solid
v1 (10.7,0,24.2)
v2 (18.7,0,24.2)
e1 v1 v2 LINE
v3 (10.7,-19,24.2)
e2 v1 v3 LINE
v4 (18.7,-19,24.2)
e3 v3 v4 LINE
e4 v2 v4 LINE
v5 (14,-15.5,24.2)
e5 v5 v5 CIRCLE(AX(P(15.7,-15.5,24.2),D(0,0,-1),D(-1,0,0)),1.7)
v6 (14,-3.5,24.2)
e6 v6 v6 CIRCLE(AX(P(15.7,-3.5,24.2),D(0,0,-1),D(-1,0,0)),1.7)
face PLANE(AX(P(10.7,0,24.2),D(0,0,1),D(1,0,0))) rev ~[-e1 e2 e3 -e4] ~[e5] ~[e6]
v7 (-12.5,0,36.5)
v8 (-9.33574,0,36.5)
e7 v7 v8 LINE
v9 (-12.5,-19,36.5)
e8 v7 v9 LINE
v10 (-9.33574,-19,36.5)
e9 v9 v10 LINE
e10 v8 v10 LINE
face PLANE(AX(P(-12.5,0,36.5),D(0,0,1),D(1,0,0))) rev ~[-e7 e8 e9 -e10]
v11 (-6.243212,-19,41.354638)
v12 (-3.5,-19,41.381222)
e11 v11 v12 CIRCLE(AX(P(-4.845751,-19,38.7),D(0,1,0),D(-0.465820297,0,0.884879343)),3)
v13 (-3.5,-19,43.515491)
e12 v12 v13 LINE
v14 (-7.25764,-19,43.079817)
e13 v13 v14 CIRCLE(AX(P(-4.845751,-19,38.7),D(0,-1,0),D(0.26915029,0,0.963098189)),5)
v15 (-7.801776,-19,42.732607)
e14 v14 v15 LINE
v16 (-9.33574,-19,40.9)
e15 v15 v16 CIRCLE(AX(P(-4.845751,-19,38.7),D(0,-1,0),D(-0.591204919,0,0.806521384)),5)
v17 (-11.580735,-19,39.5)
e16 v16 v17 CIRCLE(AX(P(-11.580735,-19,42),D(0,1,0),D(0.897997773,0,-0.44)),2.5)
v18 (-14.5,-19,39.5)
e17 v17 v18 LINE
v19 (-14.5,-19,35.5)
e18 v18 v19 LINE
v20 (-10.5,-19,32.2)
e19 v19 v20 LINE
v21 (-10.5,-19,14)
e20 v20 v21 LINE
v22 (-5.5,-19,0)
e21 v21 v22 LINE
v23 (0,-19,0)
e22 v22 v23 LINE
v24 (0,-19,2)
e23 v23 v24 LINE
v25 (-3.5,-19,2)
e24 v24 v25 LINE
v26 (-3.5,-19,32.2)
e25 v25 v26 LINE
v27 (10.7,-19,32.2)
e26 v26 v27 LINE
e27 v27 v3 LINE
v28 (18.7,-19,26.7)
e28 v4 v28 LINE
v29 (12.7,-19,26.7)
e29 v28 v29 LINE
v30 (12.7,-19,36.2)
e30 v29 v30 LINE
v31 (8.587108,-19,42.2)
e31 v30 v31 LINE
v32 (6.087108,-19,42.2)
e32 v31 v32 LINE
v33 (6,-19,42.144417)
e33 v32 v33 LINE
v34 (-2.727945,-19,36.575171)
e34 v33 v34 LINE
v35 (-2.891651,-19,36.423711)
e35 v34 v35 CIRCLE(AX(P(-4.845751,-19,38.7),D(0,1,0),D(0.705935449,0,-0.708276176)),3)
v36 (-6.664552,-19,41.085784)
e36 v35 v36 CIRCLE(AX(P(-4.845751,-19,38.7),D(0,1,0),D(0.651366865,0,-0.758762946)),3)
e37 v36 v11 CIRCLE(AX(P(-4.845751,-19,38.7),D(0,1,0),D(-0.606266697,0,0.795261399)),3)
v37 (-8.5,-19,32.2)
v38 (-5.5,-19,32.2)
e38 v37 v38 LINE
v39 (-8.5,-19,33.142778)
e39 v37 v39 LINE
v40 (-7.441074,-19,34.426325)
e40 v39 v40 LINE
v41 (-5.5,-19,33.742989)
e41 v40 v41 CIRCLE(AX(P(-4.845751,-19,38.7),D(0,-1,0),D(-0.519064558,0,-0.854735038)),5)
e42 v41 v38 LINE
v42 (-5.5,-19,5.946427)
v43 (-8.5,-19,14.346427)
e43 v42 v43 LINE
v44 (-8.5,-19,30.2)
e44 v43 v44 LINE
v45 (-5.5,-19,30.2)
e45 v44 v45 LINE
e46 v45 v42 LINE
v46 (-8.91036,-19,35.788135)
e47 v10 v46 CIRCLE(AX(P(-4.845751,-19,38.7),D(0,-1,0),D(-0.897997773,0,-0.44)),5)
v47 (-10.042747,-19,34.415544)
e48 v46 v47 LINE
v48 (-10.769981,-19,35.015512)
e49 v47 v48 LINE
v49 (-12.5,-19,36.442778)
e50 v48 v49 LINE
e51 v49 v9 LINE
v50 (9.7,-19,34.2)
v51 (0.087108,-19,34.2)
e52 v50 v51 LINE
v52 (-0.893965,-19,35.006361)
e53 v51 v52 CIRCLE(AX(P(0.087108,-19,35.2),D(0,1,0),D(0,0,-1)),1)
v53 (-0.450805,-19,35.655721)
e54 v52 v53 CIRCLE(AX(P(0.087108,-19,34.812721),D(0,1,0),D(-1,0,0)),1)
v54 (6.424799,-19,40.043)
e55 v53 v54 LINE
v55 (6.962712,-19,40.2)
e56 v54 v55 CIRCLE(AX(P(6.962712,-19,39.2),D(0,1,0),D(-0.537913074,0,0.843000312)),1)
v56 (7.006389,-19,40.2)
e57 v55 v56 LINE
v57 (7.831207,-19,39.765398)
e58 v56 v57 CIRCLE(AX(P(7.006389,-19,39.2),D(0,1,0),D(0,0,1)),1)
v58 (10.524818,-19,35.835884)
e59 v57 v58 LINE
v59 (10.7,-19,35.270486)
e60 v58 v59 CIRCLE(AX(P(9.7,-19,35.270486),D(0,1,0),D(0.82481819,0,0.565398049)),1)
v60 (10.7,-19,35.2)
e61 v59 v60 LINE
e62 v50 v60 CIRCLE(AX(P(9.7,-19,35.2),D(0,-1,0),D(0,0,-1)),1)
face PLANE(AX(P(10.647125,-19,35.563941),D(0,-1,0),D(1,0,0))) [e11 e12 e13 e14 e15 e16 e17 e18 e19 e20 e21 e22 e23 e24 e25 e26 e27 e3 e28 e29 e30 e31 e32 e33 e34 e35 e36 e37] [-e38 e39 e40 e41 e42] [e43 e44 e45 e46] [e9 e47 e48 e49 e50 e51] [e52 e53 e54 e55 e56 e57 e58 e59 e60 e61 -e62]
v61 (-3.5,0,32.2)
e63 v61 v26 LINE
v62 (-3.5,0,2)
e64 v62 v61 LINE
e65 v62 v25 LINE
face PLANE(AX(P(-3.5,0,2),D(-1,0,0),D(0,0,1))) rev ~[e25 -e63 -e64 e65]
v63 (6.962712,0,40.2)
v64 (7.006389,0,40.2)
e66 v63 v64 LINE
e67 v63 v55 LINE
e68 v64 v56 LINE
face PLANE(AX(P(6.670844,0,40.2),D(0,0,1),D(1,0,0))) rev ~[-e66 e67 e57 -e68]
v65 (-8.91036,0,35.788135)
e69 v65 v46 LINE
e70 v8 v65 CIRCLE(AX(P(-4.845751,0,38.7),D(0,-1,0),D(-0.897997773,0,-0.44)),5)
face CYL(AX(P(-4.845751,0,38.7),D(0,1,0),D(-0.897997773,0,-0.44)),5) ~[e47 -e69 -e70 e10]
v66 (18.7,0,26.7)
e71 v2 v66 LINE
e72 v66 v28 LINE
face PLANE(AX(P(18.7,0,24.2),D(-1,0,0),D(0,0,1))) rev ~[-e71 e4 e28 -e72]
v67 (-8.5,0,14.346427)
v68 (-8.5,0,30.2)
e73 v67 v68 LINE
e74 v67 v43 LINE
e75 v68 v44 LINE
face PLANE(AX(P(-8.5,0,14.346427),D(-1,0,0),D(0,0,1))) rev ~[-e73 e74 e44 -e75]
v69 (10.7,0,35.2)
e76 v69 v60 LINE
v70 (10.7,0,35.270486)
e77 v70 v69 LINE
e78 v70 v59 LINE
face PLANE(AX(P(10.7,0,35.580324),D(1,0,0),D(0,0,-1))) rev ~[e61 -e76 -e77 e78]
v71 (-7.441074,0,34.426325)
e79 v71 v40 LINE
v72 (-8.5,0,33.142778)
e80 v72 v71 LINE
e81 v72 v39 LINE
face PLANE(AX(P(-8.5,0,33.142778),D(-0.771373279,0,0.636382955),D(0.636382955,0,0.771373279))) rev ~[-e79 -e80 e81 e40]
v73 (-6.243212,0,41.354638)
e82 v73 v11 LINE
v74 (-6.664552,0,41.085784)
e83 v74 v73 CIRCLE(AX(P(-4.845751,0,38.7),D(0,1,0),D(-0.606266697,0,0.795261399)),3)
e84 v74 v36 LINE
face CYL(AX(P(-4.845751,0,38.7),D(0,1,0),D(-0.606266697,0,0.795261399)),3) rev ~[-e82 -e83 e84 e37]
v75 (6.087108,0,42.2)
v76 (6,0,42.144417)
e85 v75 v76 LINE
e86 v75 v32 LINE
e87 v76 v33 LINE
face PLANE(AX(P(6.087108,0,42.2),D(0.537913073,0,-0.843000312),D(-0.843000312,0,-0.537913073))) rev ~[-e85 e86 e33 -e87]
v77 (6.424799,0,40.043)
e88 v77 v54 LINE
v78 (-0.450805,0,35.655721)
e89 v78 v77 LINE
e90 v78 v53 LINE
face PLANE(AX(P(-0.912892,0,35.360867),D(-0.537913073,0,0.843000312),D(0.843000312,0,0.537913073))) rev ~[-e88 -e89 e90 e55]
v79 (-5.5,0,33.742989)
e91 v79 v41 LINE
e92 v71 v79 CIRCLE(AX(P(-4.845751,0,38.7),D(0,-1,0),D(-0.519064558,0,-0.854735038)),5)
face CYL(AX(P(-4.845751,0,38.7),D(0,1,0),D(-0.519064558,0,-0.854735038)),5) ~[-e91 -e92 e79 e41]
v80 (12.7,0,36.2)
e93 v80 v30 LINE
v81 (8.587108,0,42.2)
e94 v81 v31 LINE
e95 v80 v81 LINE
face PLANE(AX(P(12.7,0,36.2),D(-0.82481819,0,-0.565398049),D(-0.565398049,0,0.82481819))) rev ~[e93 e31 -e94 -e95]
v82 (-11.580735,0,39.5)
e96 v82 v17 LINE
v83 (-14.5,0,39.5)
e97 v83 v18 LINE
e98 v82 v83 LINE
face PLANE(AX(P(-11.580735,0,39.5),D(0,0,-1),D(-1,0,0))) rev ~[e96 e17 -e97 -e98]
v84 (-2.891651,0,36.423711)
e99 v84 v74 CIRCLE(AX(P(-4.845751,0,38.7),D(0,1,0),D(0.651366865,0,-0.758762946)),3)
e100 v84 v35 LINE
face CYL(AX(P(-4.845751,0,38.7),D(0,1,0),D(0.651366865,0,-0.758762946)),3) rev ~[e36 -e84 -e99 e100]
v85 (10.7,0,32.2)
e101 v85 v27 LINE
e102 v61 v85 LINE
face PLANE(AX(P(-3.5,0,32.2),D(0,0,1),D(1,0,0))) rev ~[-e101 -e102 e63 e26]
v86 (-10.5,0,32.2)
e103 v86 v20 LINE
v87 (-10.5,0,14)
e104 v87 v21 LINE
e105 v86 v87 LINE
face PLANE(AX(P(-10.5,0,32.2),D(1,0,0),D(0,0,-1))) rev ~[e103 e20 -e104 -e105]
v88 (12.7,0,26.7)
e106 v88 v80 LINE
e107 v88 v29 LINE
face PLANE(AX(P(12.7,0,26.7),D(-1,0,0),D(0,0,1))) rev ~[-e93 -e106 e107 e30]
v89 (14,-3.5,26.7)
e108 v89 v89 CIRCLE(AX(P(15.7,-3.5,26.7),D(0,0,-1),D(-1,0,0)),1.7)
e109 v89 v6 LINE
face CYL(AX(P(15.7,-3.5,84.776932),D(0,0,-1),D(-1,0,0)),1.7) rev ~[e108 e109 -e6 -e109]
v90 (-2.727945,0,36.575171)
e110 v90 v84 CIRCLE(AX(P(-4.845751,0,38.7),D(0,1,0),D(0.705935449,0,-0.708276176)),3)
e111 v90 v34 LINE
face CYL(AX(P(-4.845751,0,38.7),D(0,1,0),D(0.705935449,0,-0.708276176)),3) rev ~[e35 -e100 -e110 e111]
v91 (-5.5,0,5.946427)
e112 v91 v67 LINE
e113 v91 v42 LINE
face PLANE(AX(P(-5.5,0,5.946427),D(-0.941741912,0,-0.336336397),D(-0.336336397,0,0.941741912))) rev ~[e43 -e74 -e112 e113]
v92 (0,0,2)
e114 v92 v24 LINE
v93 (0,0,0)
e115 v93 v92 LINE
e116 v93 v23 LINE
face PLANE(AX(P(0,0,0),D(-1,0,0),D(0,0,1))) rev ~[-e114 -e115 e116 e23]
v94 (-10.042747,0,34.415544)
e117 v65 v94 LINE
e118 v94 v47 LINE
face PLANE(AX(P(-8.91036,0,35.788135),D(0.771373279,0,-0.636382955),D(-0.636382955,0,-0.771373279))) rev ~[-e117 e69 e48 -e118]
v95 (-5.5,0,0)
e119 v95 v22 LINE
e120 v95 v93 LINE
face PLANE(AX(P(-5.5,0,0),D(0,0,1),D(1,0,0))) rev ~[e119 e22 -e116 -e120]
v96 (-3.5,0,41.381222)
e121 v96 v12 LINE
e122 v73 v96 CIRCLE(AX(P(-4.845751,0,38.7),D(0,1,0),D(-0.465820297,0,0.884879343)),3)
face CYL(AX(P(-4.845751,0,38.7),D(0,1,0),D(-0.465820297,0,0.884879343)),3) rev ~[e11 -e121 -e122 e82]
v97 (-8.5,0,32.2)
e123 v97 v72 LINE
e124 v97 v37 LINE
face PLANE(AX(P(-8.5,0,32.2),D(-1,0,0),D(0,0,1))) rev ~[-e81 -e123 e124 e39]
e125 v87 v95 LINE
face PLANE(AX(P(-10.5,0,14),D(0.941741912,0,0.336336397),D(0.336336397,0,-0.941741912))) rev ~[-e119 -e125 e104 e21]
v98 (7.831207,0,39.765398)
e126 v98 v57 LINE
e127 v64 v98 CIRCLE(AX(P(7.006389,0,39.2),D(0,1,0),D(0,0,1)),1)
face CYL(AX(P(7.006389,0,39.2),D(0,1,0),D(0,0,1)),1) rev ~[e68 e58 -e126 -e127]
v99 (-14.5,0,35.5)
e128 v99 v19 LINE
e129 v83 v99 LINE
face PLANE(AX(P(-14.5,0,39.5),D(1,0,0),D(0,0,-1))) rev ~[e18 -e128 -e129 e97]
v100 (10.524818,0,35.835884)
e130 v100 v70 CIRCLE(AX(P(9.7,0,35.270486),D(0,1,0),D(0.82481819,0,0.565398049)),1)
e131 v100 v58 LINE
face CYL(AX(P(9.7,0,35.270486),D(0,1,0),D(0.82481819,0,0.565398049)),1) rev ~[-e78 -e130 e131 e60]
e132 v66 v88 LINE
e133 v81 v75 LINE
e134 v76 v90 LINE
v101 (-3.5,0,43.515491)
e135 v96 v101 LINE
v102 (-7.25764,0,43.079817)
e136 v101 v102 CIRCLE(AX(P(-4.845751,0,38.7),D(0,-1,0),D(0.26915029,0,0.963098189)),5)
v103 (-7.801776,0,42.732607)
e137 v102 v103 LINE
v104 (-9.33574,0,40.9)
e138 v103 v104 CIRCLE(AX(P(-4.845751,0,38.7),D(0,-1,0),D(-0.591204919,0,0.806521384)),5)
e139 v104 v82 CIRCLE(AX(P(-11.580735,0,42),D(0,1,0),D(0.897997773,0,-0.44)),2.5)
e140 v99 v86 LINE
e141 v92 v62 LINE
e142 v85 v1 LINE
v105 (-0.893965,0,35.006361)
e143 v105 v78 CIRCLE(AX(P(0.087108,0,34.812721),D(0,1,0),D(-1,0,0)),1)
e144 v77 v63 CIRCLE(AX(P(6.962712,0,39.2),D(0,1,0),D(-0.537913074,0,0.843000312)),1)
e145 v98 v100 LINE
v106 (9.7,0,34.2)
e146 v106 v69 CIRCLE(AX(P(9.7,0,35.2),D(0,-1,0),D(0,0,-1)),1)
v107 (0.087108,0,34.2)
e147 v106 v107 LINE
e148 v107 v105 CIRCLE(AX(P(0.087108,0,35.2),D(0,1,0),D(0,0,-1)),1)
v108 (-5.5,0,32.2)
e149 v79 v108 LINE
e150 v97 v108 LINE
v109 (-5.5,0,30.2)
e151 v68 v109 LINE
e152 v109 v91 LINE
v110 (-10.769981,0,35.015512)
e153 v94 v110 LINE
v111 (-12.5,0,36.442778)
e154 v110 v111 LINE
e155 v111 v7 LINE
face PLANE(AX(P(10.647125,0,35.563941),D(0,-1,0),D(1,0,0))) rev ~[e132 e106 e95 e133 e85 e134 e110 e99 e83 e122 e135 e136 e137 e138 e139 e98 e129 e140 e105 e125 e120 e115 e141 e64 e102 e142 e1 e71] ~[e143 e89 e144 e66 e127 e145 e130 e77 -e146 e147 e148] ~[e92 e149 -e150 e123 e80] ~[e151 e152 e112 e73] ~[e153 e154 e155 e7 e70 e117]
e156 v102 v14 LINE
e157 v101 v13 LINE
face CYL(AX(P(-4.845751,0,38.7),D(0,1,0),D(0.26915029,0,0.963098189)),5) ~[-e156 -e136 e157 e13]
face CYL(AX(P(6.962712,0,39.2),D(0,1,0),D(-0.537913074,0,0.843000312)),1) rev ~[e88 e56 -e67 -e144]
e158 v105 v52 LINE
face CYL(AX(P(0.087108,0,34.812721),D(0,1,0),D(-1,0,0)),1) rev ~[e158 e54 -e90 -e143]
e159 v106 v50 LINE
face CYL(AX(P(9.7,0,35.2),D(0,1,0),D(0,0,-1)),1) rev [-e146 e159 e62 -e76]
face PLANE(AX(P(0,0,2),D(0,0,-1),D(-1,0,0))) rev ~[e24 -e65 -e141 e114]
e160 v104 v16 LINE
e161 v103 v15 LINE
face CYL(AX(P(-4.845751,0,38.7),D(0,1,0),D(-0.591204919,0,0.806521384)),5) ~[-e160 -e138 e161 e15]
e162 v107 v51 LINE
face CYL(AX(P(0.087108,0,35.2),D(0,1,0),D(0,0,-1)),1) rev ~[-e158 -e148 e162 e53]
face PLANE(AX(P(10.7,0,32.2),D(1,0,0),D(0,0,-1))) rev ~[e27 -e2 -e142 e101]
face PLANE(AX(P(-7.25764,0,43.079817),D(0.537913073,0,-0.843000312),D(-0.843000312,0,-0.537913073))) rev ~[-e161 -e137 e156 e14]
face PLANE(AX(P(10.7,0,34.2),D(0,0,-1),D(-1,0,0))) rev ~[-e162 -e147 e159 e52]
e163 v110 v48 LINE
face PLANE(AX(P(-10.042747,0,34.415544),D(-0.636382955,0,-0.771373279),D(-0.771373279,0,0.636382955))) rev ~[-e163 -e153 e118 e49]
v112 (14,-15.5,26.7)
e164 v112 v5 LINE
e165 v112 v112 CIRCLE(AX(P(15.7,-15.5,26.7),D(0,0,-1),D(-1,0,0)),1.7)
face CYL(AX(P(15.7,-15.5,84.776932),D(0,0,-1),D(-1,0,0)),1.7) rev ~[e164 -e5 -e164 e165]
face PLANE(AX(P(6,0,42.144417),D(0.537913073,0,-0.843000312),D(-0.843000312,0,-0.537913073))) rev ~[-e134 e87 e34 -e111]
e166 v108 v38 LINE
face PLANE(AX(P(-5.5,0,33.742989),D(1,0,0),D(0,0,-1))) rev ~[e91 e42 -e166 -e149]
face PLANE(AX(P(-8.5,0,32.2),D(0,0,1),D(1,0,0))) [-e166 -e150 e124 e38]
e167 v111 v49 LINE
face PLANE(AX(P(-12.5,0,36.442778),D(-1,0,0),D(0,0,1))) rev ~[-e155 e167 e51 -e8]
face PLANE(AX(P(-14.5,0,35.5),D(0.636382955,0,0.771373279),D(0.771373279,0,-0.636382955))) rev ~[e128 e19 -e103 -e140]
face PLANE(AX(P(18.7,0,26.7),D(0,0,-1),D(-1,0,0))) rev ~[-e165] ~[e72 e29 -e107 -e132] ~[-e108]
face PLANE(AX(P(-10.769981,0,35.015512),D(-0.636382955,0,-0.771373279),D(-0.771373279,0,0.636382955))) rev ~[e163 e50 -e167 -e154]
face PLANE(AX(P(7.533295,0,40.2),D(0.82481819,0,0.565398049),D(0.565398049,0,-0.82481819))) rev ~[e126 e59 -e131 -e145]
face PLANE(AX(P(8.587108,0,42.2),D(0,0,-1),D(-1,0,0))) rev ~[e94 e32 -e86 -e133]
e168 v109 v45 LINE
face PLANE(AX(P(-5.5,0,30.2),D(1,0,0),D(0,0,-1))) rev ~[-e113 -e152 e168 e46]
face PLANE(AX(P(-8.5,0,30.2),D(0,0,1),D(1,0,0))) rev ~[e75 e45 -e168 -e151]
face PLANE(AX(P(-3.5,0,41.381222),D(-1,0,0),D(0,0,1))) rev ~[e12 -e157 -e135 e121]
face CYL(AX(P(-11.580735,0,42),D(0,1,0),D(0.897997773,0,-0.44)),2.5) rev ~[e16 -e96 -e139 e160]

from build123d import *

# Parameters (mm, degrees)
F0_W        = 3
F0_H        = 2
F1_DEPTH    = 19
F3_D        = 3.4
F4_T1_DEPTH = 19


# Not quite as in the source:
# - a fillet or chamfer that OpenCascade refuses, or shapes differently, is made with other operations: its cross-section is extruded or revolved along the edge and cut away or added


with BuildPart() as f1:
    # F0 (on Front) → F1 (new body)
    with BuildSketch(Plane.XZ):
        with Locations((-7, 31.2)):
            Rectangle(F0_W, F0_H)
        with BuildLine():
            Line((-10.0427465571, 34.4155443421), (-8.5, 33.1427784325))
            Line((-8.5, 33.1427784325), (-7.441074238, 34.4263248107))
            ThreePointArc((-7.441074238, 34.4263248107), (-8.244619139, 35.032889635), (-8.9103596286, 35.7881345584))
            Line((-8.9103596286, 35.7881345584), (-10.0427465571, 34.4155443421))
        make_face()
        with BuildLine():
            Line((-10.5, 14), (-5.5, 0))
            Line((-5.5, 0), (-5.5, 5.9464274989))
            Line((-5.5, 5.9464274989), (-8.5, 14.3464274989))
            Line((-8.5, 14.3464274989), (-8.5, 30.2))
            Line((-8.5, 30.2), (-8.5, 32.2))
            Line((-8.5, 32.2), (-8.5, 33.1427784325))
            Line((-8.5, 33.1427784325), (-10.0427465571, 34.4155443421))
            Line((-10.0427465571, 34.4155443421), (-10.7699806475, 35.0155124667))
            Line((-10.7699806475, 35.0155124667), (-12.5, 36.4427784325))
            Line((-12.5, 36.4427784325), (-12.5, 36.5))
            Line((-12.5, 36.5), (-9.3357403136, 36.5))
            ThreePointArc((-9.3357403136, 36.5), (-9.7907115521, 37.9601557031), (-9.7830217401, 39.4895328221))
            ThreePointArc((-9.7830217401, 39.4895328221), (-9.7333018776, 39.7544433664), (-9.6693788597, 40.0162897125))
            ThreePointArc((-9.6693788597, 40.0162897125), (-9.5234750406, 40.4660413374), (-9.3357403136, 40.9))
            ThreePointArc((-9.3357403136, 40.9), (-10.2578590901, 39.8786796564), (-11.5807347457, 39.5))
            Line((-11.5807347457, 39.5), (-14.5, 39.5))
            Line((-14.5, 39.5), (-14.5, 35.5))
            Line((-14.5, 35.5), (-10.5, 32.2))
            Line((-10.5, 32.2), (-10.5, 14))
        make_face()
        with BuildLine():
            Line((-4.3254974298, 0), (0, 0))
            Line((0, 0), (0, 2))
            Line((0, 2), (-3.5, 2))
            Line((-3.5, 2), (-3.5, 32.2))
            Line((-3.5, 32.2), (6, 32.2))
            Line((6, 32.2), (10.7, 32.2))
            Line((10.7, 32.2), (10.7, 24.2))
            Line((10.7, 24.2), (18.7, 24.2))
            Line((18.7, 24.2), (18.7, 26.7))
            Line((18.7, 26.7), (12.7, 26.7))
            Line((12.7, 26.7), (12.7, 36.2))
            Line((12.7, 36.2), (8.5871078054, 42.2))
            Line((8.5871078054, 42.2), (6.0871078054, 42.2))
            Line((6.0871078054, 42.2), (6, 42.14441707))
            Line((6, 42.14441707), (-2.7279451008, 36.5751714729))
            ThreePointArc((-2.7279451008, 36.5751714729), (-2.80839002, 36.4979195279), (-2.8916508552, 36.4237111635))
            ThreePointArc((-2.8916508552, 36.4237111635), (-7.1777694161, 36.8127553939), (-6.6645515402, 41.085784196))
            ThreePointArc((-6.6645515402, 41.085784196), (-6.4594906698, 41.2290009349), (-6.2432123403, 41.3546380278))
            ThreePointArc((-6.2432123403, 41.3546380278), (-4.8748228701, 41.6998591388), (-3.5, 41.3812223027))
            Line((-3.5, 41.3812223027), (-3.5, 43.5154909445))
            ThreePointArc((-3.5, 43.5154909445), (-5.4216118426, 43.6667277767), (-7.2576401277, 43.0798165491))
            Line((-7.2576401277, 43.0798165491), (-7.8017760466, 42.7326069212))
            ThreePointArc((-7.8017760466, 42.7326069212), (-8.6798603613, 41.909300368), (-9.3357403136, 40.9))
            ThreePointArc((-9.3357403136, 40.9), (-9.5234750406, 40.4660413374), (-9.6693788597, 40.0162897125))
            ThreePointArc((-9.6693788597, 40.0162897125), (-9.7333018776, 39.7544433664), (-9.7830217401, 39.4895328221))
            ThreePointArc((-9.7830217401, 39.4895328221), (-9.7907115521, 37.9601557031), (-9.3357403136, 36.5))
            ThreePointArc((-9.3357403136, 36.5), (-9.1378337815, 36.1352330993), (-8.9103596286, 35.7881345584))
            ThreePointArc((-8.9103596286, 35.7881345584), (-8.244619139, 35.032889635), (-7.441074238, 34.4263248107))
            ThreePointArc((-7.441074238, 34.4263248107), (-6.506072339, 33.9837160238), (-5.5, 33.7429889213))
            Line((-5.5, 33.7429889213), (-5.5, 32.3898009956))
            Line((-5.5, 32.3898009956), (-5.5, 32.2))
            Line((-5.5, 32.2), (-5.5, 30.2))
            Line((-5.5, 30.2), (-5.5, 5.9464274989))
            Line((-5.5, 5.9464274989), (-5.5, 0))
            Line((-5.5, 0), (-4.3254974298, 0))
        make_face()
        Polygon((-0.9128921946, 34.2), (-0.9128921946, 35.3608666872), (6.6708440859, 40.2), (7.5332950832, 40.2), (10.7, 35.5803239662), (10.7, 34.2), align=None, mode=Mode.SUBTRACT)
    extrude(amount=F1_DEPTH)

    # F3 (through all)
    with Locations(Plane.XY.offset(26.7)):
        with Locations((15.7, -15.5), (15.7, -3.5)):
            Hole(F3_D / 2)

    # F4: fillet of radius 1 on 6 edges, made by hand

    # F4_s2 → F4_t1 (join)
    with BuildSketch(Plane.XZ):
        with BuildLine():
            ThreePointArc((10.5248181897, 35.8358839984), (10.6552010756, 35.5664435563), (10.7, 35.2704859494))
            Line((10.7, 35.2704859494), (10.7, 35.5803239662))
            Line((10.7, 35.5803239662), (10.5248181897, 35.8358839984))
        make_face()
        with BuildLine():
            ThreePointArc((7.0063887221, 40.2), (7.4725442492, 40.0847027888), (7.8312069118, 39.7653980491))
            Line((7.8312069118, 39.7653980491), (7.5332950832, 40.2))
            Line((7.5332950832, 40.2), (7.0063887221, 40.2))
        make_face()
        with BuildLine():
            ThreePointArc((6.4247991527, 40.0430003116), (6.6825339897, 40.1599479964), (6.9627122262, 40.2))
            Line((6.9627122262, 40.2), (6.6708440859, 40.2))
            Line((6.6708440859, 40.2), (6.4247991527, 40.0430003116))
        make_face()
        with BuildLine():
            ThreePointArc((-0.9128921946, 34.8127210695), (-0.7897938633, 35.2933908764), (-0.450805268, 35.6557213811))
            Line((-0.450805268, 35.6557213811), (-0.9128921946, 35.3608666872))
            Line((-0.9128921946, 35.3608666872), (-0.9128921946, 34.8127210695))
        make_face()
        with BuildLine():
            ThreePointArc((0.0871078054, 34.2), (-0.6199989757, 34.4928932188), (-0.9128921946, 35.2))
            Line((-0.9128921946, 35.2), (-0.9128921946, 34.2))
            Line((-0.9128921946, 34.2), (0.0871078054, 34.2))
        make_face()
        with BuildLine():
            ThreePointArc((9.7, 34.2), (10.4071067812, 34.4928932188), (10.7, 35.2))
            Line((10.7, 35.2), (10.7, 34.2))
            Line((10.7, 34.2), (9.7, 34.2))
        make_face()
    extrude(amount=F4_T1_DEPTH)


solid = f1.part
